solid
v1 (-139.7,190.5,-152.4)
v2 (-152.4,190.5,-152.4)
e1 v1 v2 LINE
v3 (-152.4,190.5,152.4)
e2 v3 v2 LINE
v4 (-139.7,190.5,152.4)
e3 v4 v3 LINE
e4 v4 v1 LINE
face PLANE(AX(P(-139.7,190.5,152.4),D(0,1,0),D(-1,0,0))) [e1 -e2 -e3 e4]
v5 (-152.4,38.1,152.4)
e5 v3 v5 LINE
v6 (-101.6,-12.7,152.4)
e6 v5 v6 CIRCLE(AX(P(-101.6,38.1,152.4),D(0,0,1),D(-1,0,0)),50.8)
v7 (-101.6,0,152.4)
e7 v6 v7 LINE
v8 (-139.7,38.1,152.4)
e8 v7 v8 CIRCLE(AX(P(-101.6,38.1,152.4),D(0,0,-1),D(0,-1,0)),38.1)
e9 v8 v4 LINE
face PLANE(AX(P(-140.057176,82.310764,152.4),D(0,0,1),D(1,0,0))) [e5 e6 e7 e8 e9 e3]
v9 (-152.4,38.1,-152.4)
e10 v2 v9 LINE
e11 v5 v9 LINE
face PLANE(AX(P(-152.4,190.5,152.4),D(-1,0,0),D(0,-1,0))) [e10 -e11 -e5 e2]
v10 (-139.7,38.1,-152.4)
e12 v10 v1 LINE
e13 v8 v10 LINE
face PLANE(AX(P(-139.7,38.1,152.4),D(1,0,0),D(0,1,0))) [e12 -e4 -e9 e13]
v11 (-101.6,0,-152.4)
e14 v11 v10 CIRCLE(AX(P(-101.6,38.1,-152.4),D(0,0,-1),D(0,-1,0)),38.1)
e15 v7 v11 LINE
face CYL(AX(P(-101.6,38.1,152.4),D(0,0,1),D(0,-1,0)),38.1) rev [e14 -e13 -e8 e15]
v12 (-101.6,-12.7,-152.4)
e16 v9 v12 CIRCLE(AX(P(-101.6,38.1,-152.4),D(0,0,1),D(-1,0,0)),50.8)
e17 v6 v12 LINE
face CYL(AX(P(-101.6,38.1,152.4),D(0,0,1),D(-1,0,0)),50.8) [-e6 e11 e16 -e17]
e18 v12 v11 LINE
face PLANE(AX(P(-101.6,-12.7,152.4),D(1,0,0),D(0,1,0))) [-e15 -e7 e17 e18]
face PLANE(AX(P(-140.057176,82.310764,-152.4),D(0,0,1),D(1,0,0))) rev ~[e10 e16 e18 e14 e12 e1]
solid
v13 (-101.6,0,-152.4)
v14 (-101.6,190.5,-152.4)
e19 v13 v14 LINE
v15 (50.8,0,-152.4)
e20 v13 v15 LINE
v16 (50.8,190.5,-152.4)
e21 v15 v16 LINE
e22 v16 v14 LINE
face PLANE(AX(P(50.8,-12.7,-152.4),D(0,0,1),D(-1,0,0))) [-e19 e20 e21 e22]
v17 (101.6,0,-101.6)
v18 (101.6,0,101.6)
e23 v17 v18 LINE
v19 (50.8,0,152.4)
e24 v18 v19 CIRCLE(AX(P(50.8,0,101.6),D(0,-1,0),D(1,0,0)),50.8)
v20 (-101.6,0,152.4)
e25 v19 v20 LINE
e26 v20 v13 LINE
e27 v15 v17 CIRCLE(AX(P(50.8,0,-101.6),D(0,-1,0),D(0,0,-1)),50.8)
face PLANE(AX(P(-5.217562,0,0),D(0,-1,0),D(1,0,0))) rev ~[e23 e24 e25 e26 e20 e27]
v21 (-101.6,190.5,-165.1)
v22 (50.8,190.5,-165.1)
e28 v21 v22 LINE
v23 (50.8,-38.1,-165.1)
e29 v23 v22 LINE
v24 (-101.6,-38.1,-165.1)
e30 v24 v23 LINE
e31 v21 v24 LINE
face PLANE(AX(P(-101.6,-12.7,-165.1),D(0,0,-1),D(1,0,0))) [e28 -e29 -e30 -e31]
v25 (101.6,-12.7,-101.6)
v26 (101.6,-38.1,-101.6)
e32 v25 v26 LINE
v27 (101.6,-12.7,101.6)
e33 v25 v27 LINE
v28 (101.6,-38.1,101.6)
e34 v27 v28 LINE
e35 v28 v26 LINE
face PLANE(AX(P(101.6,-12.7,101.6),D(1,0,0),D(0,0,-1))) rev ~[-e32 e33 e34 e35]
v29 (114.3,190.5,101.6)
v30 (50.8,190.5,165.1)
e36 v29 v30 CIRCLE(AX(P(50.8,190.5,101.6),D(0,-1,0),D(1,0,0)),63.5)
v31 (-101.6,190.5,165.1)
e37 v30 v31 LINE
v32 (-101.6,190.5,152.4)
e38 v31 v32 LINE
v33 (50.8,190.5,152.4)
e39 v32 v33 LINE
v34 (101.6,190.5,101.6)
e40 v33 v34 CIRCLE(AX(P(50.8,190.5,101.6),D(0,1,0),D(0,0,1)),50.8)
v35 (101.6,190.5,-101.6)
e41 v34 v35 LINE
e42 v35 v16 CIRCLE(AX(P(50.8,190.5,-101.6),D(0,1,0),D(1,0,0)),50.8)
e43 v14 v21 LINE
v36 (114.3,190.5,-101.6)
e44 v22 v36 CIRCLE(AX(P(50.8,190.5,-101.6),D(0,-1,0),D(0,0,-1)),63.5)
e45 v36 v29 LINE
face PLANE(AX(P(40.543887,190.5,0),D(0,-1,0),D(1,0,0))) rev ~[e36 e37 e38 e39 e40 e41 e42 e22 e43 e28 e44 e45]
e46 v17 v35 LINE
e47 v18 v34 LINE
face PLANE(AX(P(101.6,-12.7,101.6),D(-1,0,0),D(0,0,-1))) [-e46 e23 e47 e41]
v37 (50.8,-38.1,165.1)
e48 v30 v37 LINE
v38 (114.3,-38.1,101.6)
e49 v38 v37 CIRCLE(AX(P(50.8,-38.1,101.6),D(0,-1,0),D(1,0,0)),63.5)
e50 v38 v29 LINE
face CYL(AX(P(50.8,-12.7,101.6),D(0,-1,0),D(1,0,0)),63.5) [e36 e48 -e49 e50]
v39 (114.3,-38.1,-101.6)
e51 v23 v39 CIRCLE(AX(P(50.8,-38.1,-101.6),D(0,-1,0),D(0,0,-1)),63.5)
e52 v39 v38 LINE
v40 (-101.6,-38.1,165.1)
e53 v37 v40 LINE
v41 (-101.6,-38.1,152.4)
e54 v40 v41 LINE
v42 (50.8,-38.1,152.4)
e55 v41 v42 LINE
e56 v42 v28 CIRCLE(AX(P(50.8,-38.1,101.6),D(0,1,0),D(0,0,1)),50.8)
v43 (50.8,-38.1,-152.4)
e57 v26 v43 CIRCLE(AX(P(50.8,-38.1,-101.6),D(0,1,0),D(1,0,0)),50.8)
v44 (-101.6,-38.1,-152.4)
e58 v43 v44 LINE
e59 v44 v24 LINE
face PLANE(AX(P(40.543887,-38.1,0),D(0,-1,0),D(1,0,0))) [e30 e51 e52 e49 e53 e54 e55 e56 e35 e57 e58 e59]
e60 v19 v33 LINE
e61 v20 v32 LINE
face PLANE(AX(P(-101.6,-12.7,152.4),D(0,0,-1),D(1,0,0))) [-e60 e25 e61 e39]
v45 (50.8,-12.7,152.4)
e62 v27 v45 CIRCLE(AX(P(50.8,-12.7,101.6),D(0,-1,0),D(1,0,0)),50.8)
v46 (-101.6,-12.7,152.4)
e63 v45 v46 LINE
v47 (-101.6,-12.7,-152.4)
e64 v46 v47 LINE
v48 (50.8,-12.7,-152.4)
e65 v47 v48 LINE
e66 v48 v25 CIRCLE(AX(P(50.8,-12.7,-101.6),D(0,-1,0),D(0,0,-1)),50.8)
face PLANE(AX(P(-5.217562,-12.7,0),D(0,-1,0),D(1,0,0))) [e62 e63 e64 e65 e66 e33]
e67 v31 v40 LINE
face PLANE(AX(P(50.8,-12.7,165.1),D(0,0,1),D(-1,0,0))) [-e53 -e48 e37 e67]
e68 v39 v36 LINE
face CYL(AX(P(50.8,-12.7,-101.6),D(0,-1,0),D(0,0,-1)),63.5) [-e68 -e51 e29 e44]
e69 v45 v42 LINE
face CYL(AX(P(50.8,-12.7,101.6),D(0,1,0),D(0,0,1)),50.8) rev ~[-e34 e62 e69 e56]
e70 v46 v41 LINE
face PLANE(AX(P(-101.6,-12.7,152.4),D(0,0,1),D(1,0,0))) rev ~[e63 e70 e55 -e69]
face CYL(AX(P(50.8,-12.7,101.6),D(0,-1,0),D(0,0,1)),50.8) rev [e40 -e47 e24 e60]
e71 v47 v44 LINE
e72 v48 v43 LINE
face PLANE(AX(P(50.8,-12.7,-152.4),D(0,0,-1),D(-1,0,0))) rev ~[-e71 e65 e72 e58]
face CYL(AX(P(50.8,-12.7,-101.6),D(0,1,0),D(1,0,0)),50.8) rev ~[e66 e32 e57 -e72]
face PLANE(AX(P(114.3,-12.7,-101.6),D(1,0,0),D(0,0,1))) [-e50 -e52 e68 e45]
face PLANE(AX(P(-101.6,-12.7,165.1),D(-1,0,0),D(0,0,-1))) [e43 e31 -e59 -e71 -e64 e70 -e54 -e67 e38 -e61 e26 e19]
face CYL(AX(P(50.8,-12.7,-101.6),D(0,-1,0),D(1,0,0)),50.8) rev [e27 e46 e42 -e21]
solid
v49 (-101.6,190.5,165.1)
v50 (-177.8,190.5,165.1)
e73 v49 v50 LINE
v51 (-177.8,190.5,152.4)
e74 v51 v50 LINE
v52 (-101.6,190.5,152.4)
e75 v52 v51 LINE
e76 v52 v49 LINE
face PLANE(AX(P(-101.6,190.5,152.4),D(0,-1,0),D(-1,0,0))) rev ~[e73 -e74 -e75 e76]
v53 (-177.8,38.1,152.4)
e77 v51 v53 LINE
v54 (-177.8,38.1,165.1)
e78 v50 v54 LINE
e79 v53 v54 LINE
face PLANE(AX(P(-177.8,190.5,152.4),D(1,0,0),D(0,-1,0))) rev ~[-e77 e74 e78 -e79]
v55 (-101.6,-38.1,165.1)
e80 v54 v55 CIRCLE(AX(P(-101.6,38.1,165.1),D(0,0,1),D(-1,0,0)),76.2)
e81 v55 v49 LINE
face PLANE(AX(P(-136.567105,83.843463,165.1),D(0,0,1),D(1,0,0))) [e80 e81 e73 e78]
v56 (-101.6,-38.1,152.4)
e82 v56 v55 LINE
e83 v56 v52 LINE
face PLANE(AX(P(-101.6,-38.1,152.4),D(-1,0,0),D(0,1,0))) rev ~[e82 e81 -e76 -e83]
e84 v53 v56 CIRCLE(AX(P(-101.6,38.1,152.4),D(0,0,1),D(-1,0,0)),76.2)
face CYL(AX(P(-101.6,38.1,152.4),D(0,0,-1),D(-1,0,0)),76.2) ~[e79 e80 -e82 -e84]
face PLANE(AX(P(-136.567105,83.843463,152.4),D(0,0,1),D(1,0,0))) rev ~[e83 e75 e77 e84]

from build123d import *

# Parameters (mm, degrees)
F1_DEPTH      = 12.7
F3_DEPTH      = 304.8
F5_DEPTH      = 25.4
F5_DEPTH_BACK = 203.2
F7_DEPTH      = 12.7


with BuildPart() as f1:
    # F0 (on Front) → F1 (new body)
    with BuildSketch(Plane.XZ):
        with BuildLine():
            ThreePointArc((101.6, 101.6), (86.7210244843, 137.5210244843), (50.8, 152.4))
            Line((50.8, 152.4), (-101.6, 152.4))
            Line((-101.6, 152.4), (-101.6, -152.4))
            Line((-101.6, -152.4), (50.8, -152.4))
            ThreePointArc((50.8, -152.4), (86.7210244843, -137.5210244843), (101.6, -101.6))
            Line((101.6, -101.6), (101.6, 101.6))
        make_face()
    extrude(amount=F1_DEPTH)

    # F4 (on face) → F5 (join, two sides)
    with BuildSketch(Plane.XZ.offset(12.7)) as f5_sk:
        with BuildLine():
            ThreePointArc((114.3, 101.6), (95.7012806053, 146.5012806053), (50.8, 165.1))
            Line((50.8, 165.1), (-101.6, 165.1))
            Line((-101.6, 165.1), (-101.6, 152.4))
            Line((-101.6, 152.4), (50.8, 152.4))
            ThreePointArc((50.8, 152.4), (86.7210244843, 137.5210244843), (101.6, 101.6))
            Line((101.6, 101.6), (101.6, -101.6))
            ThreePointArc((101.6, -101.6), (86.7210244843, -137.5210244843), (50.8, -152.4))
            Line((50.8, -152.4), (-101.6, -152.4))
            Line((-101.6, -152.4), (-101.6, -165.1))
            Line((-101.6, -165.1), (50.8, -165.1))
            ThreePointArc((50.8, -165.1), (95.7012806053, -146.5012806053), (114.3, -101.6))
            Line((114.3, -101.6), (114.3, 101.6))
        make_face()
    extrude(amount=F5_DEPTH)
    extrude(f5_sk.sketch, amount=-F5_DEPTH_BACK)


with BuildPart() as f3:
    # F2 (on face) → F3 (new body)
    with BuildSketch(Plane.XY.offset(152.4)):
        with BuildLine():
            Line((-152.4, 190.5), (-152.4, 38.1))
            ThreePointArc((-152.4, 38.1), (-137.5210244843, 2.1789755157), (-101.6, -12.7))
            Line((-101.6, -12.7), (-101.6, 0))
            ThreePointArc((-101.6, 0), (-128.5407683632, 11.1592316368), (-139.7, 38.1))
            Line((-139.7, 38.1), (-139.7, 190.5))
            Line((-139.7, 190.5), (-152.4, 190.5))
        make_face()
    extrude(amount=-F3_DEPTH)


with BuildPart() as f7:
    # F6 (on face) → F7 (new body)
    with BuildSketch(Plane.XY.offset(152.4)):
        with BuildLine():
            Line((-177.8, 190.5), (-177.8, 38.1))
            ThreePointArc((-177.8, 38.1), (-155.4815367264, -15.7815367264), (-101.6, -38.1))
            Line((-101.6, -38.1), (-101.6, 190.5))
            Line((-101.6, 190.5), (-177.8, 190.5))
        make_face()
    extrude(amount=F7_DEPTH)


solid = Compound([f1.part, f3.part, f7.part])
